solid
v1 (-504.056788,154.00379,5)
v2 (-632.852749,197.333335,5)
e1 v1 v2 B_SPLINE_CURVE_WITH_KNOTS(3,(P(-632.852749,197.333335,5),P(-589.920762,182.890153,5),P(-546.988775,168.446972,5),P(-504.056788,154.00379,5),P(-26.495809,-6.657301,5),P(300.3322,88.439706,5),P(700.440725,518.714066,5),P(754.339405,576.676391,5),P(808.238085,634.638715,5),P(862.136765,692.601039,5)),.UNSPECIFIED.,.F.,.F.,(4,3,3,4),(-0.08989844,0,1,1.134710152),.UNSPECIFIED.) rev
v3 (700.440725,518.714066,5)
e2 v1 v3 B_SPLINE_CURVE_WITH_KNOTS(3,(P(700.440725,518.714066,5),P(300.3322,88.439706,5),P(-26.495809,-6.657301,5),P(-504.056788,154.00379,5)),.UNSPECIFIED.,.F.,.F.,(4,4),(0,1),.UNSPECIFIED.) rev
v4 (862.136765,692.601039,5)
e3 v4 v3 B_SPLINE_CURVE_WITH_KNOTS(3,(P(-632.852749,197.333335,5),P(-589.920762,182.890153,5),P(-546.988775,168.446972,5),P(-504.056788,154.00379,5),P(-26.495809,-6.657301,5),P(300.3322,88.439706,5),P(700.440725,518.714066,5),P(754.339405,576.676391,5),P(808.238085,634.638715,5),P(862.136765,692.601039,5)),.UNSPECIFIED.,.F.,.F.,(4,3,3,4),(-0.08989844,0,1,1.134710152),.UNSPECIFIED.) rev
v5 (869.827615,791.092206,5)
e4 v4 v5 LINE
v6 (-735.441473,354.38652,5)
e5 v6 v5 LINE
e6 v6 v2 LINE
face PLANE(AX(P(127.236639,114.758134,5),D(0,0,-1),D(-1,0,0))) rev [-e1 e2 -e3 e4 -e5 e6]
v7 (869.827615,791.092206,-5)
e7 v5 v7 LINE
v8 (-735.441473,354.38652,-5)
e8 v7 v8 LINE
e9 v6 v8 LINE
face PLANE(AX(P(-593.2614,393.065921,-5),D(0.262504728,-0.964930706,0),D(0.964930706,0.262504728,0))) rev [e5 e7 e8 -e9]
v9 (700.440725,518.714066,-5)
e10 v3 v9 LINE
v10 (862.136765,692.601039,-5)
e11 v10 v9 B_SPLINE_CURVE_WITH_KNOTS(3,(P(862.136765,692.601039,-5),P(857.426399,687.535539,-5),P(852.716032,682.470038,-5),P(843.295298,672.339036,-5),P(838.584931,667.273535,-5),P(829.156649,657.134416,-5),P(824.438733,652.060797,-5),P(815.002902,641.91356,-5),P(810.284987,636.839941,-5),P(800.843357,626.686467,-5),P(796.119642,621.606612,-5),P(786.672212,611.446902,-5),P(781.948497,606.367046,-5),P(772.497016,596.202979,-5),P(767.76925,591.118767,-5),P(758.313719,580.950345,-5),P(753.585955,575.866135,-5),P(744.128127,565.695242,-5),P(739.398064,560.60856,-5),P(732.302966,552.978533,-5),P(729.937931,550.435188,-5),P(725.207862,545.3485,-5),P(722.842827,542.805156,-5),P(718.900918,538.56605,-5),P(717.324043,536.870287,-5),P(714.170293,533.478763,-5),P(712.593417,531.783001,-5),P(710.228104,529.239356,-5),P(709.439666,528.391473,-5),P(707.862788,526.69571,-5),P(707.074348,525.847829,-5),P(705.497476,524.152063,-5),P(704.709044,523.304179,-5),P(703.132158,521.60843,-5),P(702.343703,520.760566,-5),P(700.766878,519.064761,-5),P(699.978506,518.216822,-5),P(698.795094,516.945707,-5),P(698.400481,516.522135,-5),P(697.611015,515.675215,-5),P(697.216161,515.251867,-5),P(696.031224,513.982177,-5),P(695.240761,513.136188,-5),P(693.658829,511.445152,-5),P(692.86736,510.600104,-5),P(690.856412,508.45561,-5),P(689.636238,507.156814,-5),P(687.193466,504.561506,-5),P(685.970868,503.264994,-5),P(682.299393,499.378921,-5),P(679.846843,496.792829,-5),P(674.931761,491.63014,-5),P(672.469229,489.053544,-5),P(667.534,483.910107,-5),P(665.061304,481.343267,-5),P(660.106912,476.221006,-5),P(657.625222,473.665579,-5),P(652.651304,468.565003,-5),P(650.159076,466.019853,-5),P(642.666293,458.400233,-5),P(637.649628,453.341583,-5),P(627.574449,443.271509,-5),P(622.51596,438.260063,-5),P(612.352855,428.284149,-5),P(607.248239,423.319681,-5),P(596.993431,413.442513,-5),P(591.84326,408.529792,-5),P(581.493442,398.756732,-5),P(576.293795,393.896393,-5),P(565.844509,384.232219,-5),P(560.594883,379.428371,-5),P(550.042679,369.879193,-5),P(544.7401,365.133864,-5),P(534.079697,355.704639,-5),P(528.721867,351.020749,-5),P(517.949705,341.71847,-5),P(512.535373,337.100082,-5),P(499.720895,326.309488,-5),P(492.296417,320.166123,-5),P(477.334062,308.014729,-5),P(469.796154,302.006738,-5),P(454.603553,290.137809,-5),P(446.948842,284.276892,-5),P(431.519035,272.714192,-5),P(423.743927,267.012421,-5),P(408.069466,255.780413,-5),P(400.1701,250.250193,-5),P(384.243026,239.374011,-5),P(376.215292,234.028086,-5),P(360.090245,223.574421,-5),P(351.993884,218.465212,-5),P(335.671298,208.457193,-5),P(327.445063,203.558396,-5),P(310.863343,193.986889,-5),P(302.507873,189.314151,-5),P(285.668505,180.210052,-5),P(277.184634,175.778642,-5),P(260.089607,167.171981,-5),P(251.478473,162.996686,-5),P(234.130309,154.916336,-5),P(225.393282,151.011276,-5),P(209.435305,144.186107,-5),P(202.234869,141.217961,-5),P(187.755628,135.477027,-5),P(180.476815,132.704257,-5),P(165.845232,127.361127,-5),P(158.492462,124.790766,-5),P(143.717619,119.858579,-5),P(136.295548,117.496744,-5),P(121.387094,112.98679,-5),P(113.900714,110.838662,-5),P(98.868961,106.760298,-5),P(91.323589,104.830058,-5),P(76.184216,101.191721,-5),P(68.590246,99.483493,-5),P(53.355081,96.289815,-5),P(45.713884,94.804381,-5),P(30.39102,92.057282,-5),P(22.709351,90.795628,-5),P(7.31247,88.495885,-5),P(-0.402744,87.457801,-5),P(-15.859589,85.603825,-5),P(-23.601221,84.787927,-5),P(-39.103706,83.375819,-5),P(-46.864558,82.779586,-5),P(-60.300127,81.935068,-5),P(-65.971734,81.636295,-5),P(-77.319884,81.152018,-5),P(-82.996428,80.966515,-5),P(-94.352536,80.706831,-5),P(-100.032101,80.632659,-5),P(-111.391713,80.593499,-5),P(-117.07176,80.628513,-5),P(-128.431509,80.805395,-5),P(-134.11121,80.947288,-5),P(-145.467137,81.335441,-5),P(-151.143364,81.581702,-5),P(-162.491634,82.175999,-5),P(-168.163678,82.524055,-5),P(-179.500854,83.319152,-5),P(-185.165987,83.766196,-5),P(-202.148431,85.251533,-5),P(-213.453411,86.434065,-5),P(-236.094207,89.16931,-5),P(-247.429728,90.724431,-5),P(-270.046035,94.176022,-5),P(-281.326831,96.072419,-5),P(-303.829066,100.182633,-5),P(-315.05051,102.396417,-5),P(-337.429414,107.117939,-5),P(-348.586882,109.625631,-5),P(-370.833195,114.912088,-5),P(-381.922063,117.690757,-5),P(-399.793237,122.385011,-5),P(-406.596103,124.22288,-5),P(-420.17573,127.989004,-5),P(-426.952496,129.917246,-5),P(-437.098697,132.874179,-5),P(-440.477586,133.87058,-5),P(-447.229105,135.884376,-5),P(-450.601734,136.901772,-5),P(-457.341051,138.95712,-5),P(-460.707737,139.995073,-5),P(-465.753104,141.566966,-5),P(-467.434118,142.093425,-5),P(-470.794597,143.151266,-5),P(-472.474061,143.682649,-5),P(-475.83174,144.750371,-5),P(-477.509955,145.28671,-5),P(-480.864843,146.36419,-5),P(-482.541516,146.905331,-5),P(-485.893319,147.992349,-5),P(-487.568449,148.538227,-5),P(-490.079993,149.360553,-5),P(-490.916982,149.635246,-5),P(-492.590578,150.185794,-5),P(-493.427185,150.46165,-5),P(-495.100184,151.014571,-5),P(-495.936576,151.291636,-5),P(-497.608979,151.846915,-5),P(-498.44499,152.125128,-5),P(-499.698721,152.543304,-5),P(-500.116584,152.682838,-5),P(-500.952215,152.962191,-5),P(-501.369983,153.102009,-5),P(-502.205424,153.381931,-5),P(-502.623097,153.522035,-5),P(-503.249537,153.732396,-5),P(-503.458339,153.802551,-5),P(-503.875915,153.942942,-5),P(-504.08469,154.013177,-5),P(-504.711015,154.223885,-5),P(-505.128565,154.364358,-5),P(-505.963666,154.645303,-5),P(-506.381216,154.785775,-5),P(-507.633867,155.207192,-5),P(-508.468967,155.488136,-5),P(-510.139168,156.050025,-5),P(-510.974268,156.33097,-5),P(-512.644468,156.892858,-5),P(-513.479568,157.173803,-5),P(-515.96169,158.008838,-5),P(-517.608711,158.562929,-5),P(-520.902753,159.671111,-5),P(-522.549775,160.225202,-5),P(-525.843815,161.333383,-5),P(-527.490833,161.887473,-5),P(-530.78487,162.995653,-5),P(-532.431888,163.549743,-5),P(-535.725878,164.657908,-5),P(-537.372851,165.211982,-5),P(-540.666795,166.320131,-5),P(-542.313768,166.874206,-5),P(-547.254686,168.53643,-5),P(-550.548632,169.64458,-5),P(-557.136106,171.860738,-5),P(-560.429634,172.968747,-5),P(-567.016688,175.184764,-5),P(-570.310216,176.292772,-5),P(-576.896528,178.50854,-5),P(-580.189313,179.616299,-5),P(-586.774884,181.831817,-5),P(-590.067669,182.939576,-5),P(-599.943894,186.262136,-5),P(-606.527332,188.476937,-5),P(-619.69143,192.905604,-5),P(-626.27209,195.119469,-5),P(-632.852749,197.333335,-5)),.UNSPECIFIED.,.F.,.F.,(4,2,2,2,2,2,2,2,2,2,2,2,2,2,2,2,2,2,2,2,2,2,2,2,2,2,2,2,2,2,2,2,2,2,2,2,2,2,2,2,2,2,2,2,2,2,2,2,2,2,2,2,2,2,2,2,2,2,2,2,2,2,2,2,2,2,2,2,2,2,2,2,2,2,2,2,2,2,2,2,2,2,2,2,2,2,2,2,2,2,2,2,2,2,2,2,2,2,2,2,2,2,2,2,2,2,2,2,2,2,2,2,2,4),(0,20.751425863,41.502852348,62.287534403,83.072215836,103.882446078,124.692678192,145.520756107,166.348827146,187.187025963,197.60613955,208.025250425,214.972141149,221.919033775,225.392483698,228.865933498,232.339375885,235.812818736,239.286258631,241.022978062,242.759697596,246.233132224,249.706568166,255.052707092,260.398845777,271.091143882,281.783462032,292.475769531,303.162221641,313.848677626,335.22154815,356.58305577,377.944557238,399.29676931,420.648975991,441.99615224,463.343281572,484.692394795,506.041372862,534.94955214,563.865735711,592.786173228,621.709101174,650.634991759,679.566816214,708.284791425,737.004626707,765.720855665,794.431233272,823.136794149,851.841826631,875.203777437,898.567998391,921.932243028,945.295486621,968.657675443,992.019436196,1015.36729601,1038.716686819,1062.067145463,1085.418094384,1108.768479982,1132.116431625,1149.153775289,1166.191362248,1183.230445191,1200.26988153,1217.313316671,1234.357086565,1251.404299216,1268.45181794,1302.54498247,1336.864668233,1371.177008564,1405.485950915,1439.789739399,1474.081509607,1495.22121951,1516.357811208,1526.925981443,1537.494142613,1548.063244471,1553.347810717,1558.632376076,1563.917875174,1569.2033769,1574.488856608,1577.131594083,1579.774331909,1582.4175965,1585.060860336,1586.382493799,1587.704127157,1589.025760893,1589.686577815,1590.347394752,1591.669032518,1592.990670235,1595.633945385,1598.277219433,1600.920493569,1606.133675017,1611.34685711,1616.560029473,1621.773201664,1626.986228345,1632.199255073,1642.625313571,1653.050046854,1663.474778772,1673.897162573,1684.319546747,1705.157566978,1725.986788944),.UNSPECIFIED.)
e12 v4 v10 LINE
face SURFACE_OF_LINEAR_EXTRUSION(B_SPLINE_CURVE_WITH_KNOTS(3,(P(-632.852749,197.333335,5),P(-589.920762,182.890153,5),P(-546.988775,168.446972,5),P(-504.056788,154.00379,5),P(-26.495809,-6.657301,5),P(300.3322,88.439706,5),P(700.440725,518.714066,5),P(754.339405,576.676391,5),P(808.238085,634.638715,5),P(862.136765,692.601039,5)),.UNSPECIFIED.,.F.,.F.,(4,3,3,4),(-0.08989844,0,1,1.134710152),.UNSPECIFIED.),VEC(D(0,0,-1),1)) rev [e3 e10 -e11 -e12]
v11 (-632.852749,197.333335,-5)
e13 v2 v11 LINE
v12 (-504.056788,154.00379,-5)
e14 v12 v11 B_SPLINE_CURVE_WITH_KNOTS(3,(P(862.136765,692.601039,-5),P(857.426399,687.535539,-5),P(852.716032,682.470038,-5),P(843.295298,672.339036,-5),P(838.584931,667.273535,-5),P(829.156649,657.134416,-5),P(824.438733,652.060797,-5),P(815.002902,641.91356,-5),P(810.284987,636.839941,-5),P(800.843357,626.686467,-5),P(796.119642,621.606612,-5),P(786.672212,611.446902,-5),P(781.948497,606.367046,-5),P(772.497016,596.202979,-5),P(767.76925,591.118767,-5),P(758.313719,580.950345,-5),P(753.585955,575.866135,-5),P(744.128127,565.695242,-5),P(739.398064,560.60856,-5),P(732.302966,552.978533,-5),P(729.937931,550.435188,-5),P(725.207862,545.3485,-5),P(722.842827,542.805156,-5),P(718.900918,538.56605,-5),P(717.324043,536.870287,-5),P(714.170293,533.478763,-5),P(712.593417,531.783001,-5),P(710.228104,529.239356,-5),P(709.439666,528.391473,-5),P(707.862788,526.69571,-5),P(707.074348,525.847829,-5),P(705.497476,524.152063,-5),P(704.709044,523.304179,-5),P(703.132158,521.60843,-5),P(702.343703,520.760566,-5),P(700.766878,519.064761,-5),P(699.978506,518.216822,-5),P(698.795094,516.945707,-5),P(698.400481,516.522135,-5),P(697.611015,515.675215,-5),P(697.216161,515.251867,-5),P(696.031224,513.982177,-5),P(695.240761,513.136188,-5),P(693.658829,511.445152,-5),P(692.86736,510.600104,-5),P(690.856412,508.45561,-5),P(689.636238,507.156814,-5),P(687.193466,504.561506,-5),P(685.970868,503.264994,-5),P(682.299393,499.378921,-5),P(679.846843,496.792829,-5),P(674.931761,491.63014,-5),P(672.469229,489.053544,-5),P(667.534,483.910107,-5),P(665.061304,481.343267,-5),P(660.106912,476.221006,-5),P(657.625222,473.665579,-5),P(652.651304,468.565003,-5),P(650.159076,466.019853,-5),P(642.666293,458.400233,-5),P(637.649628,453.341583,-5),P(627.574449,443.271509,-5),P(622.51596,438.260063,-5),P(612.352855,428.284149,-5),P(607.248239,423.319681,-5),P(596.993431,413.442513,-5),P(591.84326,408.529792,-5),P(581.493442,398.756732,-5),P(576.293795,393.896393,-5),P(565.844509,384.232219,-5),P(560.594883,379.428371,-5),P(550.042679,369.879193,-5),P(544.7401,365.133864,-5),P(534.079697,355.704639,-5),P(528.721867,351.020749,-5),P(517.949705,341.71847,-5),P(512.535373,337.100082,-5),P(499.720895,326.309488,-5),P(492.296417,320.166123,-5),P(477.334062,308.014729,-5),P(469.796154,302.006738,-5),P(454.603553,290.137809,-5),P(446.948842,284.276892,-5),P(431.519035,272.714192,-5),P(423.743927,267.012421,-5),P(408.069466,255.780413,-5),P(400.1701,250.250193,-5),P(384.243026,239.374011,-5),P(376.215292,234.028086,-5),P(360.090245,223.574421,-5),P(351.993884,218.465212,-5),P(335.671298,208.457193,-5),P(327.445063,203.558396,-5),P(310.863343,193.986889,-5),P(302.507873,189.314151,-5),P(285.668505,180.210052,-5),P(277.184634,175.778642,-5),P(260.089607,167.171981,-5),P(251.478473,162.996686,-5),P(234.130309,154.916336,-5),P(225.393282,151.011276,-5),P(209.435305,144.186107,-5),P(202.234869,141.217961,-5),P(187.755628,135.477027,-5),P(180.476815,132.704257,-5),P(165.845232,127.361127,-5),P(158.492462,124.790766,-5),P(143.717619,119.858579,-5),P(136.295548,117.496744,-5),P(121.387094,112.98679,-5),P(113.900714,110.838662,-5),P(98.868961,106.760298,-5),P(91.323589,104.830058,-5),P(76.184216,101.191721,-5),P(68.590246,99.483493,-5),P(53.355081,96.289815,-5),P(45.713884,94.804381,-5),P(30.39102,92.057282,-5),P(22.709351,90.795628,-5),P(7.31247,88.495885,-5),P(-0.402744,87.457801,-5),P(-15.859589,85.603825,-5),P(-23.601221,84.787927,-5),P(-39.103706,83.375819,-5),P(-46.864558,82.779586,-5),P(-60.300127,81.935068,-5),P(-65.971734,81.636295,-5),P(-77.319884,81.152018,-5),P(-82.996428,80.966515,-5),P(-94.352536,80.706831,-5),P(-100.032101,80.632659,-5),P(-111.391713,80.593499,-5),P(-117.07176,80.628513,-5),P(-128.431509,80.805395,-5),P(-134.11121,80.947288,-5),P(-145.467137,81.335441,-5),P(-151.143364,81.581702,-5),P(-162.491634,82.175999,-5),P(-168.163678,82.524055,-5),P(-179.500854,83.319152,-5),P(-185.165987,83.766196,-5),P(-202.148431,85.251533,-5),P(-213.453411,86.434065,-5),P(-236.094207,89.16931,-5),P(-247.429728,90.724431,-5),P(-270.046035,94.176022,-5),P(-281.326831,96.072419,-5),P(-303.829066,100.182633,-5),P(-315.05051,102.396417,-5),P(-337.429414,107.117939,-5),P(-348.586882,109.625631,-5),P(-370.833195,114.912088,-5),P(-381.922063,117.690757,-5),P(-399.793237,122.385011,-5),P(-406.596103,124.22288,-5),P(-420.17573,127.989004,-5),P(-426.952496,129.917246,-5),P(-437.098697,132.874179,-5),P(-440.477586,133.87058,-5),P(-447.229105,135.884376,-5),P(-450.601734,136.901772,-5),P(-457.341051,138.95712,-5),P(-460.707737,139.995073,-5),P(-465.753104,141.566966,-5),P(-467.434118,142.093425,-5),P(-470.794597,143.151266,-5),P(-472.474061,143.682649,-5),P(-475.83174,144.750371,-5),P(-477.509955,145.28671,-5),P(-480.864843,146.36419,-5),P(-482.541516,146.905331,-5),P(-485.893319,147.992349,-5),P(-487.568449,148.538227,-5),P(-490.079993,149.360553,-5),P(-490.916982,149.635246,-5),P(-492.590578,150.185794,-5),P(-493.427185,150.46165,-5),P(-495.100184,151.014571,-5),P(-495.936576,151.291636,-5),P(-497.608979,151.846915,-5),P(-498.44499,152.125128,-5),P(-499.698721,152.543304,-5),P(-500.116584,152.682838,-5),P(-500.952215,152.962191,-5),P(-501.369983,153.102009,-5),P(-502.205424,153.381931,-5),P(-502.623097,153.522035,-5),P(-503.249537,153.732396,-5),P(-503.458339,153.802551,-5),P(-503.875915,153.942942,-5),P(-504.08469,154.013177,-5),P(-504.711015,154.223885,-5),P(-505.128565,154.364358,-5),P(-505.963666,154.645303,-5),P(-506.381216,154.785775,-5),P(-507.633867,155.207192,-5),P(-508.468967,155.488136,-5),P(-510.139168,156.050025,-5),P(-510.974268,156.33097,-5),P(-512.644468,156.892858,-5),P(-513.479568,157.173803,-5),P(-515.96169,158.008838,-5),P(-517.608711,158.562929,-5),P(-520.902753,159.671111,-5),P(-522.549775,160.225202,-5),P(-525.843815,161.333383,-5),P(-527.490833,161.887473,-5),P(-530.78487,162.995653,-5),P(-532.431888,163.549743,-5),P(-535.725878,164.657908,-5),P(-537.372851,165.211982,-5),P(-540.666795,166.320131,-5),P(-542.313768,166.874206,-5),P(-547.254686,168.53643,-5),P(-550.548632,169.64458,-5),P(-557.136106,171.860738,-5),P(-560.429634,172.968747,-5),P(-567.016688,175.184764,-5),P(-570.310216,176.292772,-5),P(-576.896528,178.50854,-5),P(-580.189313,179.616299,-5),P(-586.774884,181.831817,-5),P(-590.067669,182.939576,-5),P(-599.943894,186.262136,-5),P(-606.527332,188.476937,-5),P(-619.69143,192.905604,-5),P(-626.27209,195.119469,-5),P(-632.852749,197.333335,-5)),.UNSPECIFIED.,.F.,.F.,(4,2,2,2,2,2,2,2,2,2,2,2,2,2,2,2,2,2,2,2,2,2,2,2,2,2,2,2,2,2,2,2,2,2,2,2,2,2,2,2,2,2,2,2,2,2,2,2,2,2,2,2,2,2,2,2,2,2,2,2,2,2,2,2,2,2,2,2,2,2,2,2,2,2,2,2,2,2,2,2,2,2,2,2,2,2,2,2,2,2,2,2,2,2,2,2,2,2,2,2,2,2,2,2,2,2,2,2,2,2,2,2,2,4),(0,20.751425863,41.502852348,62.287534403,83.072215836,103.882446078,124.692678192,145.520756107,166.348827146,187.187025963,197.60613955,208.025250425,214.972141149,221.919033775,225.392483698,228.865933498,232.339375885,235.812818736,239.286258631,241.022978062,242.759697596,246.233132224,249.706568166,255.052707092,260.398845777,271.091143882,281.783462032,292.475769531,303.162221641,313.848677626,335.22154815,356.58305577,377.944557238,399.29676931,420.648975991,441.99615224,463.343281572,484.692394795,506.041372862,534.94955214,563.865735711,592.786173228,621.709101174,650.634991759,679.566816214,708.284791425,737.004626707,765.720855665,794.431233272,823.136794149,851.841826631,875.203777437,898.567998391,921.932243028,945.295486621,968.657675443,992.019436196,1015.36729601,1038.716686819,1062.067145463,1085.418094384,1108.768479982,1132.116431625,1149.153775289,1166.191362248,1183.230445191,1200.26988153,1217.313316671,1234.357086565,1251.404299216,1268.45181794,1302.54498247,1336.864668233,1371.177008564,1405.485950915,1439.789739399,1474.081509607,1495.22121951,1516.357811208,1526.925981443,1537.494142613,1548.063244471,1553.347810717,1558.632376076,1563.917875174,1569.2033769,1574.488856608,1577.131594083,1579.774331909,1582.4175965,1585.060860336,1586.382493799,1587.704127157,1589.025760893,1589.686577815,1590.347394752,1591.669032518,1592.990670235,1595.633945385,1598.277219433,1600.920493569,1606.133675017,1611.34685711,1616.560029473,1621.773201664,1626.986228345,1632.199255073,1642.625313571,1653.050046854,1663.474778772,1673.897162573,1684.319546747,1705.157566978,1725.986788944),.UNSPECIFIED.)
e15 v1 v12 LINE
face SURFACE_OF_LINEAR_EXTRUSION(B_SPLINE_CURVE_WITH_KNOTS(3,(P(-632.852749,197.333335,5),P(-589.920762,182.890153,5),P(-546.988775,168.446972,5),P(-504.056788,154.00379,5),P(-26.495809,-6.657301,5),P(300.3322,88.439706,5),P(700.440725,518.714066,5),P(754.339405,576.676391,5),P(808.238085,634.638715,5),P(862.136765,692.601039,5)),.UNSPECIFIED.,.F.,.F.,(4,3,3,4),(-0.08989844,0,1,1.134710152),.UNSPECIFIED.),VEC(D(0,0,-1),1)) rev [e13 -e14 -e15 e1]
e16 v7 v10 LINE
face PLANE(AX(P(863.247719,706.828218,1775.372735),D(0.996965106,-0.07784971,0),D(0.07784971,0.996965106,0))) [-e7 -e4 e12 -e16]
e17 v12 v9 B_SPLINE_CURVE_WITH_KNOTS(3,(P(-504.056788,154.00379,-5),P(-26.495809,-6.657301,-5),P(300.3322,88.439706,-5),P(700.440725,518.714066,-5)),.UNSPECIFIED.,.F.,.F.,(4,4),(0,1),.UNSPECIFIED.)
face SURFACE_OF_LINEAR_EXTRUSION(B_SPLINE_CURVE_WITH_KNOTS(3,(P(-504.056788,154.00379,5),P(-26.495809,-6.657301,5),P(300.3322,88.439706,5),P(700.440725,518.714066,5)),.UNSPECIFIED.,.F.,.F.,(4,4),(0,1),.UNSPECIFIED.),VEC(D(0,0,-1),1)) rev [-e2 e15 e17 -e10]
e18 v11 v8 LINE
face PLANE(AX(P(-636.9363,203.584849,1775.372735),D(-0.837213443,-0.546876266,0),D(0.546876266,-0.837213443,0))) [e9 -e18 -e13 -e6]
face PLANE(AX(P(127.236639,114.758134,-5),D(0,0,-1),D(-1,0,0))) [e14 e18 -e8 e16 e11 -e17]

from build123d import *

# Parameters (mm, degrees)
EXTRUDE_1_DEPTH          = 5
CUT_EXTRUDE_1_DEPTH      = 1094.936170742
CUT_EXTRUDE_1_DEPTH_BACK = 1094.936170742
EXTRUDE_START            = -10
EXTRUDE_2_DEPTH          = 10


# Read off the part's stored shape, not the designer's step: Бобышка-Вытянуть2
with BuildPart() as part:
    # Эскиз8 → Бобышка-Вытянуть1 (new, symmetric)
    with BuildSketch(Plane.XY):
        with BuildLine():
            Line((700.44072507, 518.714066318), (700.44072507, 840.270275573))
            Line((700.44072507, 840.270275573), (-504.056787588, 840.270275573))
            Line((-504.056787588, 840.270275573), (-504.056787588, 154.00379042))
            add(Edge.make_bspline(
                [(-504.056787588, 154.00379042), (-26.495808626, -6.657301205), (300.332199959, 88.439706024), (700.44072507, 518.714066318)],
                knots=[0, 0, 0, 0, 1, 1, 1, 1], degree=3))
        make_face()
    extrude(amount=EXTRUDE_1_DEPTH, both=True)

    # Эскиз9 → Вырез-Вытянуть1 (cut, two sides: drawn at the far end of the back side and taken through both)
    with BuildSketch(Plane.XY.offset(-CUT_EXTRUDE_1_DEPTH_BACK)):
        Polygon((-593.261399646, 393.06592095), (813.606139874, 775.797425669), (448.342415586, 1086.649231028), (-713.243753546, 944.095990713), align=None)
    extrude(amount=CUT_EXTRUDE_1_DEPTH + CUT_EXTRUDE_1_DEPTH_BACK, mode=Mode.SUBTRACT)

    # Бобышка-Вытянуть2 outline → Бобышка-Вытянуть2 (add)
    with BuildSketch(Plane(origin=(0, 0, -5), x_dir=(-1, 0, 0), z_dir=(0, 0, -1)).offset(EXTRUDE_START)):
        with BuildLine():
            Line((735.441473343, 354.386520069), (504.056787588, 417.333603899))
            Line((504.056787588, 417.333603899), (504.056787588, 154.00379042))
            add(Edge.make_bspline(
                [(632.852748705, 197.333334963), (589.920761666, 182.890153448), (546.988774627, 168.446971934), (504.056787588, 154.00379042)],
                knots=[-0.08989844, -0.08989844, -0.08989844, -0.08989844, 0, 0, 0, 0], degree=3))
            Line((632.852748705, 197.333334963), (735.441473343, 354.386520069))
        make_face()
        with BuildLine():
            add(Edge.make_bspline(
                [(-700.44072507, 518.714066318), (-754.339405201, 576.676390684), (-808.238085332, 634.63871505), (-862.136765463, 692.601039415)],
                knots=[1, 1, 1, 1, 1.134710152, 1.134710152, 1.134710152, 1.134710152], degree=3))
            Line((-700.44072507, 518.714066318), (-700.44072507, 745.011322306))
            Line((-700.44072507, 745.011322306), (-869.827615138, 791.092205896))
            Line((-869.827615138, 791.092205896), (-862.136765463, 692.601039415))
        make_face()
    extrude(amount=EXTRUDE_2_DEPTH)


solid = part.part
